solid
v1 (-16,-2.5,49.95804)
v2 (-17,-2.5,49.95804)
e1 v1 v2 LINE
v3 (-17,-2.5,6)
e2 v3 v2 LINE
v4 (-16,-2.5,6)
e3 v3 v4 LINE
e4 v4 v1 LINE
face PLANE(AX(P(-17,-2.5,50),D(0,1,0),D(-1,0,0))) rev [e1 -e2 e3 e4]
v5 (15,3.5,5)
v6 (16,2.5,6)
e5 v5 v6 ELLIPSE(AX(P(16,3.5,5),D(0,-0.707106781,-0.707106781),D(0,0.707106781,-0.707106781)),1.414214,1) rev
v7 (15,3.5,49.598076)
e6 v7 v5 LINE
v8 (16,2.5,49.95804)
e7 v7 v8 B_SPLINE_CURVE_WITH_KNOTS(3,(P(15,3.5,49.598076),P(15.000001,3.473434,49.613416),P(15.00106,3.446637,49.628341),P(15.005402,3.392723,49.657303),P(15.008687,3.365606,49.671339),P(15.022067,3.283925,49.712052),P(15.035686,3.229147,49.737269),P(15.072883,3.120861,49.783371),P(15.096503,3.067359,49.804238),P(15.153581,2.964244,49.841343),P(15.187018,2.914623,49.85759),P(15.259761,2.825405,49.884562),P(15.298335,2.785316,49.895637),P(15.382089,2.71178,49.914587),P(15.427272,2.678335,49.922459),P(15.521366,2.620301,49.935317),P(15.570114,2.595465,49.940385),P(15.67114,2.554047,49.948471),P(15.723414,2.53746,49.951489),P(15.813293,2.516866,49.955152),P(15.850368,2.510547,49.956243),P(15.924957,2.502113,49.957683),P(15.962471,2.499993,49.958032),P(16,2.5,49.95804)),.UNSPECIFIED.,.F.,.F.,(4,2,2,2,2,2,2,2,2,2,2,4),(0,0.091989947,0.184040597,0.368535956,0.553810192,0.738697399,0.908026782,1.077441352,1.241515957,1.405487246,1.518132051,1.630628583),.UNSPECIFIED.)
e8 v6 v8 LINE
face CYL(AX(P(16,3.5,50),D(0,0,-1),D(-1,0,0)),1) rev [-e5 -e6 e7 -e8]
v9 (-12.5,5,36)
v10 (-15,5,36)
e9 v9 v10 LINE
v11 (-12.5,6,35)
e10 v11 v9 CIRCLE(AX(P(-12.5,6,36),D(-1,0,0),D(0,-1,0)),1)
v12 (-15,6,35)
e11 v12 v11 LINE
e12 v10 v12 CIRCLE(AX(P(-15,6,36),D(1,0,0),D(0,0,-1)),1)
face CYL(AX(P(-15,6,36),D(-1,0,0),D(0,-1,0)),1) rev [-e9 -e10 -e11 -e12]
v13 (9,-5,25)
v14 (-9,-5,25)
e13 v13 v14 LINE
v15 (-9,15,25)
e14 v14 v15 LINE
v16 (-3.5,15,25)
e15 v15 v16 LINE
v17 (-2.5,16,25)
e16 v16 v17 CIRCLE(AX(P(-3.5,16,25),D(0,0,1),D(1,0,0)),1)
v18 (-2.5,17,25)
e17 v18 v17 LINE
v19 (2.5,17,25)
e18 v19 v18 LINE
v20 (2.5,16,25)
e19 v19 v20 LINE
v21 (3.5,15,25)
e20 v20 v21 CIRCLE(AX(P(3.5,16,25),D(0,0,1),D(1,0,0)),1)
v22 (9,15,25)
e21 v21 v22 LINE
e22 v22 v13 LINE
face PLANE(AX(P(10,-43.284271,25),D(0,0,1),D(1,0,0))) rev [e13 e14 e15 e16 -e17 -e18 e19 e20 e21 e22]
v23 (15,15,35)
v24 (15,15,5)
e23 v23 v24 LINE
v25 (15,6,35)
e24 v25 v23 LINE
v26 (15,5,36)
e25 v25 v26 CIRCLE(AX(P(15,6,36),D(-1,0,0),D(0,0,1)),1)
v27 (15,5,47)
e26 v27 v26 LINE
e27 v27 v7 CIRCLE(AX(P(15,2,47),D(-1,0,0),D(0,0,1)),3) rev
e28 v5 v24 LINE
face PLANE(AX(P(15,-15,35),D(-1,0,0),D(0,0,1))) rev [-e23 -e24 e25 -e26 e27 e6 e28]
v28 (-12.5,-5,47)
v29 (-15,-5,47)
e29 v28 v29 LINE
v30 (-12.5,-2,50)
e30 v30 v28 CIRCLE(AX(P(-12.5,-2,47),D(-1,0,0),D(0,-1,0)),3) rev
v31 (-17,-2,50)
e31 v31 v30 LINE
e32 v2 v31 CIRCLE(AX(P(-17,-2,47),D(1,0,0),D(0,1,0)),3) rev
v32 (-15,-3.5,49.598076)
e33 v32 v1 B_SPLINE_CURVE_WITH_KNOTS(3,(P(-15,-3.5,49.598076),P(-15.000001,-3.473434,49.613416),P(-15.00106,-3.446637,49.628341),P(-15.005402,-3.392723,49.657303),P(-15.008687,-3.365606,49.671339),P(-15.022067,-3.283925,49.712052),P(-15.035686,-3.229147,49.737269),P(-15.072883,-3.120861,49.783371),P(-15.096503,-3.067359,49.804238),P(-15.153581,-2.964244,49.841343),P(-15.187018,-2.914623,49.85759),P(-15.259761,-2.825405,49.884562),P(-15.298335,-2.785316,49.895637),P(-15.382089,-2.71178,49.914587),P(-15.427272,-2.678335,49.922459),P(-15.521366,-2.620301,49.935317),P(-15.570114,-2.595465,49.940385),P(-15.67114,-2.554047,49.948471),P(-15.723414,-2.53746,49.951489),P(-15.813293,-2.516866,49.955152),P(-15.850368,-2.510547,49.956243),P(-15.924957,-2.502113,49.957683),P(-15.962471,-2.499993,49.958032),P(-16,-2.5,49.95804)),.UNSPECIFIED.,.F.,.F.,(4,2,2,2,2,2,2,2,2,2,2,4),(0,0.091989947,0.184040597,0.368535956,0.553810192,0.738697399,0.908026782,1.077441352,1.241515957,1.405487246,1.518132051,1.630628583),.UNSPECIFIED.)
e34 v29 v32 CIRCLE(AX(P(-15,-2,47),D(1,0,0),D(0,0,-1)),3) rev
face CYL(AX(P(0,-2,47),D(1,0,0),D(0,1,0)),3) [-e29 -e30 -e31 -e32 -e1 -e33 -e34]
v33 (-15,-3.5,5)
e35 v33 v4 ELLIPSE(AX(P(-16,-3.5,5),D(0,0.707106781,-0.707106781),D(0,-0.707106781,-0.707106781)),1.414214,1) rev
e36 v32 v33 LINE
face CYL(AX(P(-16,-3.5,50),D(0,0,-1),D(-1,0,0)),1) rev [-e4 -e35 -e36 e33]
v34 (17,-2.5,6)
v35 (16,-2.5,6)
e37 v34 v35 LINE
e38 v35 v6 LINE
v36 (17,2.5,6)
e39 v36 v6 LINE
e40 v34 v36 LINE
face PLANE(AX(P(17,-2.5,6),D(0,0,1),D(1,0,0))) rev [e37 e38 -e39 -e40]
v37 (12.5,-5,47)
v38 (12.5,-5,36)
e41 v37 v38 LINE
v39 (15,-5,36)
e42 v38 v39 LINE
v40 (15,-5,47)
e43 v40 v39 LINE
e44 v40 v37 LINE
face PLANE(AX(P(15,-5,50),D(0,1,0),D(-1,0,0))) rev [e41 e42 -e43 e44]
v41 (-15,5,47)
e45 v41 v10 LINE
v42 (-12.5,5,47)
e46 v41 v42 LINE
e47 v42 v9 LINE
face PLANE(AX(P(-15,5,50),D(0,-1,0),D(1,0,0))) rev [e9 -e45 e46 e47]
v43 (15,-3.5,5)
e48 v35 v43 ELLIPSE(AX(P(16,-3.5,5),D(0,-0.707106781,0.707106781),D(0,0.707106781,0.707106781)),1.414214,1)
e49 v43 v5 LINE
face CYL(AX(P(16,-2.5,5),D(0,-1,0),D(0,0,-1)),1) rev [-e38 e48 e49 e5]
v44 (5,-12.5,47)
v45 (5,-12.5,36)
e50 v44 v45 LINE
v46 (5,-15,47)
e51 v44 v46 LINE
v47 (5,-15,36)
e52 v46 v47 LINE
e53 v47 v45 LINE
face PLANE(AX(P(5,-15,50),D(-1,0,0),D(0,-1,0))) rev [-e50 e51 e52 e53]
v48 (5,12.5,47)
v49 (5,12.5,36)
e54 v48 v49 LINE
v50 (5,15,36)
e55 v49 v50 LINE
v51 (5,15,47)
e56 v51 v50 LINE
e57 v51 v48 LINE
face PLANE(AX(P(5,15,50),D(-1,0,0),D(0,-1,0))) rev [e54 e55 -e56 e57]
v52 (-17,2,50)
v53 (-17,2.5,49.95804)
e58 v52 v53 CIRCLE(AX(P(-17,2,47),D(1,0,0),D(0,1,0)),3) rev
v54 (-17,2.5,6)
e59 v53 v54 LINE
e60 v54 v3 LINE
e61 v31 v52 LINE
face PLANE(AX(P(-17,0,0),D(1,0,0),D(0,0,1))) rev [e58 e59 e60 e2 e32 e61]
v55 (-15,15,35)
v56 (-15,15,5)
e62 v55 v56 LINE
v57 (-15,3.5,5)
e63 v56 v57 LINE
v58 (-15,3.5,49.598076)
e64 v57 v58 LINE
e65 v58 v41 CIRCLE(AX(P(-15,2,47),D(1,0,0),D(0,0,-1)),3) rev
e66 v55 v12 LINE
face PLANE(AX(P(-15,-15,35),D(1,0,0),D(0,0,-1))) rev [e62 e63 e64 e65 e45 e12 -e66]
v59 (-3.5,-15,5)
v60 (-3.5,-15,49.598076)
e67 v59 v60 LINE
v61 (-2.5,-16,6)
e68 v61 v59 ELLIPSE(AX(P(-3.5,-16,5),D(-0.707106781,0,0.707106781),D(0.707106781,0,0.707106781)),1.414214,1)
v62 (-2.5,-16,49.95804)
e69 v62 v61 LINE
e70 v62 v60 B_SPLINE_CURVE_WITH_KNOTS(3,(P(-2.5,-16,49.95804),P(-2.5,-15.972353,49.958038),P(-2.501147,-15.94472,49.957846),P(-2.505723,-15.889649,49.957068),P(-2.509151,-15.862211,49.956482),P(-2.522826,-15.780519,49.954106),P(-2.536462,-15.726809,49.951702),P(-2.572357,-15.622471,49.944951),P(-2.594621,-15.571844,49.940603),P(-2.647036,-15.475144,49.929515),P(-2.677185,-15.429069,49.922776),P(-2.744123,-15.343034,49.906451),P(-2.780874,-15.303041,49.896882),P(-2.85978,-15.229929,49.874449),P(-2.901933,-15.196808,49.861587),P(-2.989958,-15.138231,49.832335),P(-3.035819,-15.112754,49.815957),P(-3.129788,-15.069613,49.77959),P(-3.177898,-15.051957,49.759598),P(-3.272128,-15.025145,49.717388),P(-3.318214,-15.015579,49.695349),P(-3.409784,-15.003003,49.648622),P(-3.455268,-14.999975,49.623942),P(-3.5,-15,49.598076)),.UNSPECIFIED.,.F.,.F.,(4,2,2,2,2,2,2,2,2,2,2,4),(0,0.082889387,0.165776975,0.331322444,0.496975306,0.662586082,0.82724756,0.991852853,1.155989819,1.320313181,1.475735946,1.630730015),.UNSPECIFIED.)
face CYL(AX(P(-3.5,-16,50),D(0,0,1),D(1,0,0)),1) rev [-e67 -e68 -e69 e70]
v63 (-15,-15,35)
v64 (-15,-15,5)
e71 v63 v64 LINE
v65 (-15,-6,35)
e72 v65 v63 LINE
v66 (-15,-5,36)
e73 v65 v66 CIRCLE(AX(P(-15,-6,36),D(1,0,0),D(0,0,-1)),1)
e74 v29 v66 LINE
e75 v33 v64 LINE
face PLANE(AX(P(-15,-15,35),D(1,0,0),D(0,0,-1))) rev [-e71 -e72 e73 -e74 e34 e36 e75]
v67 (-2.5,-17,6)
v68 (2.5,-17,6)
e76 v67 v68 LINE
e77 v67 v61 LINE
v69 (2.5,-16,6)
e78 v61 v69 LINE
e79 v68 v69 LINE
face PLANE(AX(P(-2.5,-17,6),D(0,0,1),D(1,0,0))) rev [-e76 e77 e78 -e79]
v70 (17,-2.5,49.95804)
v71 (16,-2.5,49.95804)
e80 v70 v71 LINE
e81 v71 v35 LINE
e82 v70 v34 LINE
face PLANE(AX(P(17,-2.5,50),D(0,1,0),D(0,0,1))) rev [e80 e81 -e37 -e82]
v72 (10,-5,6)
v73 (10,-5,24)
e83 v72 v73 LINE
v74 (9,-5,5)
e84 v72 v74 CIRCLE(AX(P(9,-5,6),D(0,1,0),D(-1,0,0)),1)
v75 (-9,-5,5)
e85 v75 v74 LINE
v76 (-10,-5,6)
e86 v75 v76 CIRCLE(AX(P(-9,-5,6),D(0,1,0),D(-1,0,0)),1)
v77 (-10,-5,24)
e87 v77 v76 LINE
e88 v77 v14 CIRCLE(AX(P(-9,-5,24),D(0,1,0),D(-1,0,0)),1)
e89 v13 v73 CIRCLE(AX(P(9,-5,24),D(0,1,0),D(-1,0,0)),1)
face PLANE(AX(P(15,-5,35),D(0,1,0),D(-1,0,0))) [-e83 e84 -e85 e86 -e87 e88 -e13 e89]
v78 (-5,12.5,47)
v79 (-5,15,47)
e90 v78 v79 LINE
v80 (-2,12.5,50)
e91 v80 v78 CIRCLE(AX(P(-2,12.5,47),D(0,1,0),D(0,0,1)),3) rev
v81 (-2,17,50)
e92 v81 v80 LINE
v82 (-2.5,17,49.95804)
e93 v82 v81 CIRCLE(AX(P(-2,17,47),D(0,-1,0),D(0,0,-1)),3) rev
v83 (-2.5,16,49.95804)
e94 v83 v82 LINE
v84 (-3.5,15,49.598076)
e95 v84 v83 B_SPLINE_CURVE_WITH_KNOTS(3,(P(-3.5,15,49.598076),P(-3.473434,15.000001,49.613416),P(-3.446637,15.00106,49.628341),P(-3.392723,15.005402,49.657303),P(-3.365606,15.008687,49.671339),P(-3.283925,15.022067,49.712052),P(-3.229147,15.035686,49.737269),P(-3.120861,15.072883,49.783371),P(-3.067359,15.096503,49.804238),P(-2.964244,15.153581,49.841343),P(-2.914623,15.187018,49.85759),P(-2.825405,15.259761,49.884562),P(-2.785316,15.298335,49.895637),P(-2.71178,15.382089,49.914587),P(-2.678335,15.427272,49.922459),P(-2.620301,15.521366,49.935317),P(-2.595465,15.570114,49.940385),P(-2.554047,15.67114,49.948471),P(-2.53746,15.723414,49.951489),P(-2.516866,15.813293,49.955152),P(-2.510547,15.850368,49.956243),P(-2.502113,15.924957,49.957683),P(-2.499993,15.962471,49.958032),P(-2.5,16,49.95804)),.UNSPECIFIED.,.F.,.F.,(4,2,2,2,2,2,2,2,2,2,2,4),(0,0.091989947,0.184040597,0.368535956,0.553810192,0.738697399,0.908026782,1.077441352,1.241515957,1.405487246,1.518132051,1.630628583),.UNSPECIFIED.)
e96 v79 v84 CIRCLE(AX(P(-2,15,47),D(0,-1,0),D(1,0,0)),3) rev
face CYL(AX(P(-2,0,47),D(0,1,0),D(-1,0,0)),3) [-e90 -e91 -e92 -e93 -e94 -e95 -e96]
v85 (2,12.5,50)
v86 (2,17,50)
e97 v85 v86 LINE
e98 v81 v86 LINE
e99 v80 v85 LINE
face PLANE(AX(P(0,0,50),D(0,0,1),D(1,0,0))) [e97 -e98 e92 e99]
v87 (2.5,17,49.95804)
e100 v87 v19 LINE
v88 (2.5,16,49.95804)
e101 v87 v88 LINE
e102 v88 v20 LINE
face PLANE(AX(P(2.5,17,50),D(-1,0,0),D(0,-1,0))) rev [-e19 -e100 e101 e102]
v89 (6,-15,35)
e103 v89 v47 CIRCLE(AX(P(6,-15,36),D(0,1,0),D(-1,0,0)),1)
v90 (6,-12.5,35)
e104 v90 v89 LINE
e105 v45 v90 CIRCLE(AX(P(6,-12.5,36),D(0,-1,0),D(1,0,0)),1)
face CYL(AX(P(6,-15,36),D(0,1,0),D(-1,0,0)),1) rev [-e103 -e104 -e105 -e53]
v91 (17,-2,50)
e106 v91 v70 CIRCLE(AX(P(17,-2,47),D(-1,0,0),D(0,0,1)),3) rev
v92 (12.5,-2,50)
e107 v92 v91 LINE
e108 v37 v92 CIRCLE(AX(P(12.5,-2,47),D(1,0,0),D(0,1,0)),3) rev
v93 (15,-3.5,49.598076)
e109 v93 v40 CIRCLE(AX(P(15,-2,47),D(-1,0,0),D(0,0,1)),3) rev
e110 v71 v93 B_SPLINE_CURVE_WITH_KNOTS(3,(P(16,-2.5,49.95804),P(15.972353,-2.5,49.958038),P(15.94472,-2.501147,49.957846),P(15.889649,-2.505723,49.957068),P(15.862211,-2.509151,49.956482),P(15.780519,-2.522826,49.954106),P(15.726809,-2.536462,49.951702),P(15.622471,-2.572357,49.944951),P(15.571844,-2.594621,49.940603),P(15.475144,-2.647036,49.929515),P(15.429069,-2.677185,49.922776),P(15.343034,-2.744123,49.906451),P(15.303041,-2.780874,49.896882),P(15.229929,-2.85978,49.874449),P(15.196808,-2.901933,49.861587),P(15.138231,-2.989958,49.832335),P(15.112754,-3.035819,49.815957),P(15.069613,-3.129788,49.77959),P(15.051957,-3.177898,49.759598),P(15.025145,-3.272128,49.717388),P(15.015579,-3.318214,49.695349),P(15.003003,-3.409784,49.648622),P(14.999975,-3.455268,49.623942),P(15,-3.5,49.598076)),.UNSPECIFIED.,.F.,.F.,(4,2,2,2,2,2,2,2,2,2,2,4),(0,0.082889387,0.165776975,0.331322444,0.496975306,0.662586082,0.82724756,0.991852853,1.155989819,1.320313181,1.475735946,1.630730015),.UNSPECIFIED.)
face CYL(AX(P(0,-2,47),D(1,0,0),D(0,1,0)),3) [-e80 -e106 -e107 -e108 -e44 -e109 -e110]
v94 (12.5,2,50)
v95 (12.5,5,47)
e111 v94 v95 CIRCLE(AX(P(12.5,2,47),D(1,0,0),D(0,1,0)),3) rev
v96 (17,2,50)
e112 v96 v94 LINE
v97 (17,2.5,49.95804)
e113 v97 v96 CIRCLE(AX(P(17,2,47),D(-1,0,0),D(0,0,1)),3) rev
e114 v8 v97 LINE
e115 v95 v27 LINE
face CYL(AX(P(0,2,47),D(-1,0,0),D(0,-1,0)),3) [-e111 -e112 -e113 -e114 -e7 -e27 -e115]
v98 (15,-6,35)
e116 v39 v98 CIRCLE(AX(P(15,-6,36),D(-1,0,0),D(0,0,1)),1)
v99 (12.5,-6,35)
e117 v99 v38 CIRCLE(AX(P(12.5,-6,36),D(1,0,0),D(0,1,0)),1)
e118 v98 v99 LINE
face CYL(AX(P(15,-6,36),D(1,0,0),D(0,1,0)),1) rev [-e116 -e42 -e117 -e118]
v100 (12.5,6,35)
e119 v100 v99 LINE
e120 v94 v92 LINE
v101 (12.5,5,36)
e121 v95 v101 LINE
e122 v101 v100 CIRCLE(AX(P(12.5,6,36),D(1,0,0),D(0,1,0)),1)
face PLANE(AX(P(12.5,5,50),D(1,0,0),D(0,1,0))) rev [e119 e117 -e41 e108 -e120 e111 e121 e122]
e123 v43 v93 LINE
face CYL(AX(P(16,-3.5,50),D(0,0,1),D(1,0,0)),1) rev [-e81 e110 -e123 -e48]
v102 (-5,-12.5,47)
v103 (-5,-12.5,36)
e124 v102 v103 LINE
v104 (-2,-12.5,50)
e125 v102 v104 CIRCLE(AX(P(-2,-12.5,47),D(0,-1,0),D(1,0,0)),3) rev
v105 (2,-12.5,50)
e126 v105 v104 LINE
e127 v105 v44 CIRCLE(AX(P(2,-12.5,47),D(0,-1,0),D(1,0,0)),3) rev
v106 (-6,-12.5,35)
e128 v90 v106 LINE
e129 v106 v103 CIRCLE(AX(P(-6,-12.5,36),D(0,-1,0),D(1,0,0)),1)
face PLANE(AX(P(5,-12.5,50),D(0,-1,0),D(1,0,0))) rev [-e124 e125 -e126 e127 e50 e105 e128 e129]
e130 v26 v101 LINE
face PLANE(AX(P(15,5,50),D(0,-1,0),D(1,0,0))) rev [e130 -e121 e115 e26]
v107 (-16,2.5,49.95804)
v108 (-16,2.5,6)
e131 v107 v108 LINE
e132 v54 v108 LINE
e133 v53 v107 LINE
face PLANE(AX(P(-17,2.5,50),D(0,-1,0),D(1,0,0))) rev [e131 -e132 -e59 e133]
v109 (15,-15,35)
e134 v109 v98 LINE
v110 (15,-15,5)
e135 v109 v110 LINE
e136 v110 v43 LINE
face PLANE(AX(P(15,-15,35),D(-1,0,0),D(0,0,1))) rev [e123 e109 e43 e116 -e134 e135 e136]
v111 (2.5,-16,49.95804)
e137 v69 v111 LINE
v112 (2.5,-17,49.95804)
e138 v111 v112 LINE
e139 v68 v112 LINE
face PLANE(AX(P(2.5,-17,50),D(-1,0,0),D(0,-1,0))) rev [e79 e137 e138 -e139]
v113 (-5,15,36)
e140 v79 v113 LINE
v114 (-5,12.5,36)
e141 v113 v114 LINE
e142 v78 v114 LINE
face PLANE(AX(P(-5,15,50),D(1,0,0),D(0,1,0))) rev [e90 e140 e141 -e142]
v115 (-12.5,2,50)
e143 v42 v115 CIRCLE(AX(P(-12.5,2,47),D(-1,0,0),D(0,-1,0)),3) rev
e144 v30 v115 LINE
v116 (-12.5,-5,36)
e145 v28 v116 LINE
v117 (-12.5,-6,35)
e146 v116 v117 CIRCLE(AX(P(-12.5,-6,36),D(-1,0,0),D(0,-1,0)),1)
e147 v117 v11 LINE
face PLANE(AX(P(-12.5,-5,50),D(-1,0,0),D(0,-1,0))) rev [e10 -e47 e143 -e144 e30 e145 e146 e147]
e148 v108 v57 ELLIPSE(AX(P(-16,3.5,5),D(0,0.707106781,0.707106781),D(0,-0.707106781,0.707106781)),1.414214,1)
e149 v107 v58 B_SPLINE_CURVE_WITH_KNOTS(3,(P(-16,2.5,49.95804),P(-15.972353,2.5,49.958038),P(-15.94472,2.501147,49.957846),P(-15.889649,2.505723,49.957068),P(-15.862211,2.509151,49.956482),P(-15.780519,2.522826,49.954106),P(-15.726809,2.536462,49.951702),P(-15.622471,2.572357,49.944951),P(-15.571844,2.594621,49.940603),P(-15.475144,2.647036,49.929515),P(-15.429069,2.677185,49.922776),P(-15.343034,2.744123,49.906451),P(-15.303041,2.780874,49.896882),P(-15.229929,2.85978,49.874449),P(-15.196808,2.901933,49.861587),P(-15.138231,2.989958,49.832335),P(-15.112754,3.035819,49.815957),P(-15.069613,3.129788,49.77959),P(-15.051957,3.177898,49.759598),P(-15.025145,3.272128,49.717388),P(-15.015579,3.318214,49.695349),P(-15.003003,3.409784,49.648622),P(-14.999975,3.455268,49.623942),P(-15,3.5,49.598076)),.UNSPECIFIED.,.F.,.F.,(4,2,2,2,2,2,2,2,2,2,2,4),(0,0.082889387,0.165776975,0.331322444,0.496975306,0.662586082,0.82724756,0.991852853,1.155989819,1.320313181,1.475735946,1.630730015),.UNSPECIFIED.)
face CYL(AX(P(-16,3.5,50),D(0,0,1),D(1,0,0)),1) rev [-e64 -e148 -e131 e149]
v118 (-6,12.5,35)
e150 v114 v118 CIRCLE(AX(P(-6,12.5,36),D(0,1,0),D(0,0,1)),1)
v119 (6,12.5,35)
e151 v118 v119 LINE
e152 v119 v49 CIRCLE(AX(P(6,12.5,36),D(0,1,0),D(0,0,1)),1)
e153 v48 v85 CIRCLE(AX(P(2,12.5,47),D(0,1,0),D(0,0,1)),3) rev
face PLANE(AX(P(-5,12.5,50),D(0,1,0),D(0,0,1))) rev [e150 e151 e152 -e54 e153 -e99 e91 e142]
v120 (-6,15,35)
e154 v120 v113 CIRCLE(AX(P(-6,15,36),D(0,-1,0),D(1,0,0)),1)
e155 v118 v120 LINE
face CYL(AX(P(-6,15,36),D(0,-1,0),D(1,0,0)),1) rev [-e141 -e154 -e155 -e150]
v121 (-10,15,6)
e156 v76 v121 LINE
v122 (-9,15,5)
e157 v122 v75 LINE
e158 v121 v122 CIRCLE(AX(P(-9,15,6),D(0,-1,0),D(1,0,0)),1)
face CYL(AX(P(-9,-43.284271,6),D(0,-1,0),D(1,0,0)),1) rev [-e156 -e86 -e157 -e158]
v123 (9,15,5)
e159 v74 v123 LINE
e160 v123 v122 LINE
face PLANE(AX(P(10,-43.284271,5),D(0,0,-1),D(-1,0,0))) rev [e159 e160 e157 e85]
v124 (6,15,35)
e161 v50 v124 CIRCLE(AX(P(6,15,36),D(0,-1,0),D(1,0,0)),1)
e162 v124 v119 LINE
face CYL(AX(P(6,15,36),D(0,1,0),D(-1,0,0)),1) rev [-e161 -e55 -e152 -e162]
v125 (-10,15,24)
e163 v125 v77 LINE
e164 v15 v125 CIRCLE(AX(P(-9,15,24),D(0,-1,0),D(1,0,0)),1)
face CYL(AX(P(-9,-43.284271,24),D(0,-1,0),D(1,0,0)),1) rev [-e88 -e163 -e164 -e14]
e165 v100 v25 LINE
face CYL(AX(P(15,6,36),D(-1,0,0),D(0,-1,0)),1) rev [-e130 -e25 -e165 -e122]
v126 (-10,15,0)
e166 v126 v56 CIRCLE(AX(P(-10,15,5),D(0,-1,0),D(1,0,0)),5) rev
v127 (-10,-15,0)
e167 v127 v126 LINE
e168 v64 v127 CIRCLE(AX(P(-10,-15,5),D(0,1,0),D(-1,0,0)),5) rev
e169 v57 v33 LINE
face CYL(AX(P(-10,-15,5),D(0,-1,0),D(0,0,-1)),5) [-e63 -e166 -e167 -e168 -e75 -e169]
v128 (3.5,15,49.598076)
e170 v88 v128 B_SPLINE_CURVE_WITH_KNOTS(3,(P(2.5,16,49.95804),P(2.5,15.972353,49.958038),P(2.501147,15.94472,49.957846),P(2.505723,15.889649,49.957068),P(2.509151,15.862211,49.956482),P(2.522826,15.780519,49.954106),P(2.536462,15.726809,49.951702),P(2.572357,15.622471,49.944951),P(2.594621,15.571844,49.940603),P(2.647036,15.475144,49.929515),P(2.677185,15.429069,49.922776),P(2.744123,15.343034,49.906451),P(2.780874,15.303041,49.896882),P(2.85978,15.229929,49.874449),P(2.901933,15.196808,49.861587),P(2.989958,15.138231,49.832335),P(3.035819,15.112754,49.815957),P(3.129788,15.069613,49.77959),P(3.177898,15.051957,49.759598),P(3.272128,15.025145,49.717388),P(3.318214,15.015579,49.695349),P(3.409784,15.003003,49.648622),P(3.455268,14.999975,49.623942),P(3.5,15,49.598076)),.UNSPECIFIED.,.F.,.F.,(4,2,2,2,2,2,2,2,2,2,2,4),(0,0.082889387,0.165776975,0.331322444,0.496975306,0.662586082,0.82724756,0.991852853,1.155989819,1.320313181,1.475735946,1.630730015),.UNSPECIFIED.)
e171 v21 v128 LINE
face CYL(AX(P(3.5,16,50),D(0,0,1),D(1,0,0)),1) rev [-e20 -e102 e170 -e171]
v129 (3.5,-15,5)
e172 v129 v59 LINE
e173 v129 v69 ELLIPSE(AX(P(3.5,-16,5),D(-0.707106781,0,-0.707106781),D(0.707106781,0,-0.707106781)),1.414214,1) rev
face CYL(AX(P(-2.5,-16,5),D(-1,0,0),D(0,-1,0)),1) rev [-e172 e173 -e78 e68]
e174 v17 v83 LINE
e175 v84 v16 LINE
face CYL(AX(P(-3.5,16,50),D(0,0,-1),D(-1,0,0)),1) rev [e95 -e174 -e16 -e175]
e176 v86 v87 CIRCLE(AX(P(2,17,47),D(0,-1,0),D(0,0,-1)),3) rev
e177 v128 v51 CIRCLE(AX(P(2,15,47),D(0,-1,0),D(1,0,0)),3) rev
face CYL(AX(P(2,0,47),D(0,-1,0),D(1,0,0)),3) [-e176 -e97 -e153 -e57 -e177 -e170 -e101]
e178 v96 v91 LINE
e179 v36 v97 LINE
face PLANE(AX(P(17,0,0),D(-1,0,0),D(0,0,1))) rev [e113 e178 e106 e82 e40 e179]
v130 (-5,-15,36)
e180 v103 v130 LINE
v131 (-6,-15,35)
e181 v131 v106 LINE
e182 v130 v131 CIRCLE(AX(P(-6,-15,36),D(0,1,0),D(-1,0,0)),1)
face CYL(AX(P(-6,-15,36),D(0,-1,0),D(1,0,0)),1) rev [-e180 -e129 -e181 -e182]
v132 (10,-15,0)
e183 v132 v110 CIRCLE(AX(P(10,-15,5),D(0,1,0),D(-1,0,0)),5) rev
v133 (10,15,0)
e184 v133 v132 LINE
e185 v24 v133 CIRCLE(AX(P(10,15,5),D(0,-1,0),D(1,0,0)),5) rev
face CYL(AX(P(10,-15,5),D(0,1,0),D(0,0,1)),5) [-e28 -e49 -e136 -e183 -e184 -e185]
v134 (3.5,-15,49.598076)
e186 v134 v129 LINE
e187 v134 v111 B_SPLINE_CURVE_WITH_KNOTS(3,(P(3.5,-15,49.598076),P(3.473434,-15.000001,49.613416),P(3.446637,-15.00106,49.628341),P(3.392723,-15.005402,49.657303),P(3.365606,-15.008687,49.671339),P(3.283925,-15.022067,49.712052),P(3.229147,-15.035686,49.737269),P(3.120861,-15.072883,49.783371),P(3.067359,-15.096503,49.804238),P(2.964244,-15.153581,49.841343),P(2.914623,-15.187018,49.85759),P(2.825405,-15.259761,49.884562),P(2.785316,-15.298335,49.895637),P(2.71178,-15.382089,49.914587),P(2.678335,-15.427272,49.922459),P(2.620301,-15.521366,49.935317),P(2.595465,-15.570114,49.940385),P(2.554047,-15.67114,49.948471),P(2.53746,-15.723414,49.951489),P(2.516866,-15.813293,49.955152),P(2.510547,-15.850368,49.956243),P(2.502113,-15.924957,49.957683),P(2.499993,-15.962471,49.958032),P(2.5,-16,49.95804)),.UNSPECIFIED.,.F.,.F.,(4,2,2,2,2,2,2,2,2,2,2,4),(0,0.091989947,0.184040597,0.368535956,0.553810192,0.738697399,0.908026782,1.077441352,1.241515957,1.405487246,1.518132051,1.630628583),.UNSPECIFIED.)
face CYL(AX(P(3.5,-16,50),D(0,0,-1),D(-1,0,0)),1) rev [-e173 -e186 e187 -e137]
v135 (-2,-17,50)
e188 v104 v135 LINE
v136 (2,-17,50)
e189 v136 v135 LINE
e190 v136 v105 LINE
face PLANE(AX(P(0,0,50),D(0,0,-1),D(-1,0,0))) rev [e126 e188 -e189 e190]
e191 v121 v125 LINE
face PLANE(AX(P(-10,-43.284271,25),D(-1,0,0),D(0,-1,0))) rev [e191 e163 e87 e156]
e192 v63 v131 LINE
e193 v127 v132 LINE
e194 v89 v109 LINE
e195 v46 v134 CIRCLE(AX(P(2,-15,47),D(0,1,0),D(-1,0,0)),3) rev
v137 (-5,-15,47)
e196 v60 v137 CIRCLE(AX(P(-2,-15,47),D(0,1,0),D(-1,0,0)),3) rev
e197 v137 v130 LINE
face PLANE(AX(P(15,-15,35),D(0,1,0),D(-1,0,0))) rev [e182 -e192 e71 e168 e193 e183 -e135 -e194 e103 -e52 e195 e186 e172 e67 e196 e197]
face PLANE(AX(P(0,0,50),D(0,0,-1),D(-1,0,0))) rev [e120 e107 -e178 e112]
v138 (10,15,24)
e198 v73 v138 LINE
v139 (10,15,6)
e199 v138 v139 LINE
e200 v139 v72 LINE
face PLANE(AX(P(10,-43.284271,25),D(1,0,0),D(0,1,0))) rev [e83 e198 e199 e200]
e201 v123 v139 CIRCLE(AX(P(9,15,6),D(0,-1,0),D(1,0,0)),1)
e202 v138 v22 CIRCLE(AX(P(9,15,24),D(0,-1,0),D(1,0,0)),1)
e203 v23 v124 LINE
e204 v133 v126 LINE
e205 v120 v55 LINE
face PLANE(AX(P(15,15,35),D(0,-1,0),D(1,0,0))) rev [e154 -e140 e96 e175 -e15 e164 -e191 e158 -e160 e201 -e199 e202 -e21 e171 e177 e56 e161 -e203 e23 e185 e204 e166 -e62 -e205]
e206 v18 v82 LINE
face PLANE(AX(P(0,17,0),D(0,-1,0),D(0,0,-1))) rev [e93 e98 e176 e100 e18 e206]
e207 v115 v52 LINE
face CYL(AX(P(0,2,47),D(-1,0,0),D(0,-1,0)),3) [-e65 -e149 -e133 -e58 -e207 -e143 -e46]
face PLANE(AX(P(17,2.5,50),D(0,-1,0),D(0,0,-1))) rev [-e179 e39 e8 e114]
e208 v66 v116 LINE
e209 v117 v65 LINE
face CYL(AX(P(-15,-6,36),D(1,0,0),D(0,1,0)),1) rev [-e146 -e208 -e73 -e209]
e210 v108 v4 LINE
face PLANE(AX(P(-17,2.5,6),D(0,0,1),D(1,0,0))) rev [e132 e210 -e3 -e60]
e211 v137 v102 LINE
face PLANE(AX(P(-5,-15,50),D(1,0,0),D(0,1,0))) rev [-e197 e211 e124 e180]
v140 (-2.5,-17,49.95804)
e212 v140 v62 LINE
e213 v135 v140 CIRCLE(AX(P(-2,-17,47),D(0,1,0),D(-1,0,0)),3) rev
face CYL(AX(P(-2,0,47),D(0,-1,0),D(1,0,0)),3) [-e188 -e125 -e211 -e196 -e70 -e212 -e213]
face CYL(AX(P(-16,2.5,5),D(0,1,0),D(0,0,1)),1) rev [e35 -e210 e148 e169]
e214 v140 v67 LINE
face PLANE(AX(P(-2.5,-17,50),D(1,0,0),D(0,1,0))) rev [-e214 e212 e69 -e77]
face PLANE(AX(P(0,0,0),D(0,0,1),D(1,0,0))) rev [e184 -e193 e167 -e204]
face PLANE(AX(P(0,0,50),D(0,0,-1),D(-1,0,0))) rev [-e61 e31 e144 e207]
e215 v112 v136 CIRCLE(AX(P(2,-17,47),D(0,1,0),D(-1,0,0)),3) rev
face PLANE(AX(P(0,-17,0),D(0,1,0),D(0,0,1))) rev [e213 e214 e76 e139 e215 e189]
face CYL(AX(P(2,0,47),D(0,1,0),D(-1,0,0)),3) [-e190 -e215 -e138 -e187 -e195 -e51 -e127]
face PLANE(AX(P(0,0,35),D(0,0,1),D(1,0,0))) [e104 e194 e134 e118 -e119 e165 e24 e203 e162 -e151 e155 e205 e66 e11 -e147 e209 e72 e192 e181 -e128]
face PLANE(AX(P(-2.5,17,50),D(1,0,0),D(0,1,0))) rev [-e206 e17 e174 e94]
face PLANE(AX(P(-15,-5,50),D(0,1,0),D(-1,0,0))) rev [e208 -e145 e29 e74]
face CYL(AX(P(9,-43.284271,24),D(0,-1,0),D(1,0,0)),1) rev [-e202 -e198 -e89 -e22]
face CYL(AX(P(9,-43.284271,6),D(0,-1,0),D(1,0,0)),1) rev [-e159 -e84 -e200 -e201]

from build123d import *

# Parameters (mm, degrees)
SKETCH1_W           = 30
SKETCH1_H           = 30
BOSS_EXTRUDE1_DEPTH = 35
SKETCH2_W           = 20
SKETCH2_H           = 20
CUT_EXTRUDE1_DEPTH  = 20
SKETCH3_W           = 10
SKETCH3_H           = 2.5
SKETCH3_W_2         = 2.5
SKETCH3_H_2         = 10
BOSS_EXTRUDE2_DEPTH = 15
FILLET3_R           = 5
SKETCH4_W           = 44
SKETCH4_H           = 5
BOSS_EXTRUDE3_DEPTH = 2
CIRPATTERN1_COUNT   = 3
CIRPATTERN1_ANGLE   = 180
SKETCH5_W           = 5
SKETCH5_H           = 25
BOSS_EXTRUDE4_DEPTH = 2
FILLET1_R           = 1
FILLET2_R           = 3


with BuildPart() as part:
    # Sketch1 → Boss-Extrude1 (new body)
    with BuildSketch(Plane.XY):
        Rectangle(SKETCH1_W, SKETCH1_H)
    extrude(amount=BOSS_EXTRUDE1_DEPTH)

    # Sketch2 → Cut-Extrude1 (cut)
    with BuildSketch(Plane(origin=(0, 15, 0), x_dir=(1, 0, 0), z_dir=(0, 1, 0))):
        with Locations((0, -15)):
            Rectangle(SKETCH2_W, SKETCH2_H)
    extrude(amount=-CUT_EXTRUDE1_DEPTH, mode=Mode.SUBTRACT)

    # Sketch3 → Boss-Extrude2 (add)
    with BuildSketch(Plane.XY.offset(35)):
        with Locations((0, 13.75)):
            Rectangle(SKETCH3_W, SKETCH3_H)
        with Locations((13.75, 0)):
            Rectangle(SKETCH3_W_2, SKETCH3_H_2)
        with Locations((0, -13.75)):
            Rectangle(SKETCH3_W, SKETCH3_H)
        with Locations((-13.75, 0)):
            Rectangle(SKETCH3_W_2, SKETCH3_H_2)
    extrude(amount=BOSS_EXTRUDE2_DEPTH)

    # Fillet3
    fillet3_edges = [part.edges().sort_by_distance(p)[0] for p in [
        (15, 0, 0),
        (-15, 0, 0),
    ]]
    fillet(fillet3_edges, radius=FILLET3_R)

    # Sketch4 → Boss-Extrude3 (add)
    with BuildSketch(Plane(origin=(15, 0, 0), x_dir=(0, 0, -1), z_dir=(1, 0, 0))):
        with Locations((-28, 0)):
            Rectangle(SKETCH4_W, SKETCH4_H)
    boss_extrude3 = extrude(amount=BOSS_EXTRUDE3_DEPTH)

    # CirPattern1: Boss-Extrude3 ×3 about axis
    cirpattern1_axis = Axis((0, 0, 0), (0, 0, -1))
    for i in range(1, CIRPATTERN1_COUNT):
        add(boss_extrude3.rotate(cirpattern1_axis, i * CIRPATTERN1_ANGLE / (CIRPATTERN1_COUNT - 1)))

    # Sketch5 → Boss-Extrude4 (add)
    with BuildSketch(Plane(origin=(0, 15, 0), x_dir=(1, 0, 0), z_dir=(0, 1, 0))):
        with Locations((0, -37.5)):
            Rectangle(SKETCH5_W, SKETCH5_H)
    extrude(amount=BOSS_EXTRUDE4_DEPTH)

    # Fillet1
    fillet1_edges = [part.edges().sort_by_distance(p)[0] for p in [
        (-2.5, -15, 28),
        (0, -15, 6),
        (2.5, -15, 28),
        (-15, 2.5, 28),
        (-15, 0, 6),
        (-15, -2.5, 28),
        (-2.5, 15, 37.5),
        (2.5, 15, 37.5),
        (-10, 5, 25),
        (-10, 5, 5),
        (10, 5, 5),
        (10, 5, 25),
        (-5, 13.75, 35),
        (5, 13.75, 35),
        (13.75, 5, 35),
        (13.75, -5, 35),
        (5, -13.75, 35),
        (-5, -13.75, 35),
        (-13.75, -5, 35),
        (-13.75, 5, 35),
        (15, -2.5, 28),
        (15, 0, 6),
        (15, 2.5, 28),
    ]]
    fillet(fillet1_edges, radius=FILLET1_R - 0.0001)  # a hair under: the kernel refuses the full size

    # Fillet2
    fillet2_edges = [part.edges().sort_by_distance(p)[0] for p in [
        (-13.75, 5, 50),
        (-13.75, -5, 50),
        (5, -13.75, 50),
        (-5, -13.75, 50),
        (13.75, -5, 50),
        (13.75, 5, 50),
        (5, 13.75, 50),
        (-5, 13.75, 50),
    ]]
    fillet(fillet2_edges, radius=FILLET2_R)


solid = part.part
